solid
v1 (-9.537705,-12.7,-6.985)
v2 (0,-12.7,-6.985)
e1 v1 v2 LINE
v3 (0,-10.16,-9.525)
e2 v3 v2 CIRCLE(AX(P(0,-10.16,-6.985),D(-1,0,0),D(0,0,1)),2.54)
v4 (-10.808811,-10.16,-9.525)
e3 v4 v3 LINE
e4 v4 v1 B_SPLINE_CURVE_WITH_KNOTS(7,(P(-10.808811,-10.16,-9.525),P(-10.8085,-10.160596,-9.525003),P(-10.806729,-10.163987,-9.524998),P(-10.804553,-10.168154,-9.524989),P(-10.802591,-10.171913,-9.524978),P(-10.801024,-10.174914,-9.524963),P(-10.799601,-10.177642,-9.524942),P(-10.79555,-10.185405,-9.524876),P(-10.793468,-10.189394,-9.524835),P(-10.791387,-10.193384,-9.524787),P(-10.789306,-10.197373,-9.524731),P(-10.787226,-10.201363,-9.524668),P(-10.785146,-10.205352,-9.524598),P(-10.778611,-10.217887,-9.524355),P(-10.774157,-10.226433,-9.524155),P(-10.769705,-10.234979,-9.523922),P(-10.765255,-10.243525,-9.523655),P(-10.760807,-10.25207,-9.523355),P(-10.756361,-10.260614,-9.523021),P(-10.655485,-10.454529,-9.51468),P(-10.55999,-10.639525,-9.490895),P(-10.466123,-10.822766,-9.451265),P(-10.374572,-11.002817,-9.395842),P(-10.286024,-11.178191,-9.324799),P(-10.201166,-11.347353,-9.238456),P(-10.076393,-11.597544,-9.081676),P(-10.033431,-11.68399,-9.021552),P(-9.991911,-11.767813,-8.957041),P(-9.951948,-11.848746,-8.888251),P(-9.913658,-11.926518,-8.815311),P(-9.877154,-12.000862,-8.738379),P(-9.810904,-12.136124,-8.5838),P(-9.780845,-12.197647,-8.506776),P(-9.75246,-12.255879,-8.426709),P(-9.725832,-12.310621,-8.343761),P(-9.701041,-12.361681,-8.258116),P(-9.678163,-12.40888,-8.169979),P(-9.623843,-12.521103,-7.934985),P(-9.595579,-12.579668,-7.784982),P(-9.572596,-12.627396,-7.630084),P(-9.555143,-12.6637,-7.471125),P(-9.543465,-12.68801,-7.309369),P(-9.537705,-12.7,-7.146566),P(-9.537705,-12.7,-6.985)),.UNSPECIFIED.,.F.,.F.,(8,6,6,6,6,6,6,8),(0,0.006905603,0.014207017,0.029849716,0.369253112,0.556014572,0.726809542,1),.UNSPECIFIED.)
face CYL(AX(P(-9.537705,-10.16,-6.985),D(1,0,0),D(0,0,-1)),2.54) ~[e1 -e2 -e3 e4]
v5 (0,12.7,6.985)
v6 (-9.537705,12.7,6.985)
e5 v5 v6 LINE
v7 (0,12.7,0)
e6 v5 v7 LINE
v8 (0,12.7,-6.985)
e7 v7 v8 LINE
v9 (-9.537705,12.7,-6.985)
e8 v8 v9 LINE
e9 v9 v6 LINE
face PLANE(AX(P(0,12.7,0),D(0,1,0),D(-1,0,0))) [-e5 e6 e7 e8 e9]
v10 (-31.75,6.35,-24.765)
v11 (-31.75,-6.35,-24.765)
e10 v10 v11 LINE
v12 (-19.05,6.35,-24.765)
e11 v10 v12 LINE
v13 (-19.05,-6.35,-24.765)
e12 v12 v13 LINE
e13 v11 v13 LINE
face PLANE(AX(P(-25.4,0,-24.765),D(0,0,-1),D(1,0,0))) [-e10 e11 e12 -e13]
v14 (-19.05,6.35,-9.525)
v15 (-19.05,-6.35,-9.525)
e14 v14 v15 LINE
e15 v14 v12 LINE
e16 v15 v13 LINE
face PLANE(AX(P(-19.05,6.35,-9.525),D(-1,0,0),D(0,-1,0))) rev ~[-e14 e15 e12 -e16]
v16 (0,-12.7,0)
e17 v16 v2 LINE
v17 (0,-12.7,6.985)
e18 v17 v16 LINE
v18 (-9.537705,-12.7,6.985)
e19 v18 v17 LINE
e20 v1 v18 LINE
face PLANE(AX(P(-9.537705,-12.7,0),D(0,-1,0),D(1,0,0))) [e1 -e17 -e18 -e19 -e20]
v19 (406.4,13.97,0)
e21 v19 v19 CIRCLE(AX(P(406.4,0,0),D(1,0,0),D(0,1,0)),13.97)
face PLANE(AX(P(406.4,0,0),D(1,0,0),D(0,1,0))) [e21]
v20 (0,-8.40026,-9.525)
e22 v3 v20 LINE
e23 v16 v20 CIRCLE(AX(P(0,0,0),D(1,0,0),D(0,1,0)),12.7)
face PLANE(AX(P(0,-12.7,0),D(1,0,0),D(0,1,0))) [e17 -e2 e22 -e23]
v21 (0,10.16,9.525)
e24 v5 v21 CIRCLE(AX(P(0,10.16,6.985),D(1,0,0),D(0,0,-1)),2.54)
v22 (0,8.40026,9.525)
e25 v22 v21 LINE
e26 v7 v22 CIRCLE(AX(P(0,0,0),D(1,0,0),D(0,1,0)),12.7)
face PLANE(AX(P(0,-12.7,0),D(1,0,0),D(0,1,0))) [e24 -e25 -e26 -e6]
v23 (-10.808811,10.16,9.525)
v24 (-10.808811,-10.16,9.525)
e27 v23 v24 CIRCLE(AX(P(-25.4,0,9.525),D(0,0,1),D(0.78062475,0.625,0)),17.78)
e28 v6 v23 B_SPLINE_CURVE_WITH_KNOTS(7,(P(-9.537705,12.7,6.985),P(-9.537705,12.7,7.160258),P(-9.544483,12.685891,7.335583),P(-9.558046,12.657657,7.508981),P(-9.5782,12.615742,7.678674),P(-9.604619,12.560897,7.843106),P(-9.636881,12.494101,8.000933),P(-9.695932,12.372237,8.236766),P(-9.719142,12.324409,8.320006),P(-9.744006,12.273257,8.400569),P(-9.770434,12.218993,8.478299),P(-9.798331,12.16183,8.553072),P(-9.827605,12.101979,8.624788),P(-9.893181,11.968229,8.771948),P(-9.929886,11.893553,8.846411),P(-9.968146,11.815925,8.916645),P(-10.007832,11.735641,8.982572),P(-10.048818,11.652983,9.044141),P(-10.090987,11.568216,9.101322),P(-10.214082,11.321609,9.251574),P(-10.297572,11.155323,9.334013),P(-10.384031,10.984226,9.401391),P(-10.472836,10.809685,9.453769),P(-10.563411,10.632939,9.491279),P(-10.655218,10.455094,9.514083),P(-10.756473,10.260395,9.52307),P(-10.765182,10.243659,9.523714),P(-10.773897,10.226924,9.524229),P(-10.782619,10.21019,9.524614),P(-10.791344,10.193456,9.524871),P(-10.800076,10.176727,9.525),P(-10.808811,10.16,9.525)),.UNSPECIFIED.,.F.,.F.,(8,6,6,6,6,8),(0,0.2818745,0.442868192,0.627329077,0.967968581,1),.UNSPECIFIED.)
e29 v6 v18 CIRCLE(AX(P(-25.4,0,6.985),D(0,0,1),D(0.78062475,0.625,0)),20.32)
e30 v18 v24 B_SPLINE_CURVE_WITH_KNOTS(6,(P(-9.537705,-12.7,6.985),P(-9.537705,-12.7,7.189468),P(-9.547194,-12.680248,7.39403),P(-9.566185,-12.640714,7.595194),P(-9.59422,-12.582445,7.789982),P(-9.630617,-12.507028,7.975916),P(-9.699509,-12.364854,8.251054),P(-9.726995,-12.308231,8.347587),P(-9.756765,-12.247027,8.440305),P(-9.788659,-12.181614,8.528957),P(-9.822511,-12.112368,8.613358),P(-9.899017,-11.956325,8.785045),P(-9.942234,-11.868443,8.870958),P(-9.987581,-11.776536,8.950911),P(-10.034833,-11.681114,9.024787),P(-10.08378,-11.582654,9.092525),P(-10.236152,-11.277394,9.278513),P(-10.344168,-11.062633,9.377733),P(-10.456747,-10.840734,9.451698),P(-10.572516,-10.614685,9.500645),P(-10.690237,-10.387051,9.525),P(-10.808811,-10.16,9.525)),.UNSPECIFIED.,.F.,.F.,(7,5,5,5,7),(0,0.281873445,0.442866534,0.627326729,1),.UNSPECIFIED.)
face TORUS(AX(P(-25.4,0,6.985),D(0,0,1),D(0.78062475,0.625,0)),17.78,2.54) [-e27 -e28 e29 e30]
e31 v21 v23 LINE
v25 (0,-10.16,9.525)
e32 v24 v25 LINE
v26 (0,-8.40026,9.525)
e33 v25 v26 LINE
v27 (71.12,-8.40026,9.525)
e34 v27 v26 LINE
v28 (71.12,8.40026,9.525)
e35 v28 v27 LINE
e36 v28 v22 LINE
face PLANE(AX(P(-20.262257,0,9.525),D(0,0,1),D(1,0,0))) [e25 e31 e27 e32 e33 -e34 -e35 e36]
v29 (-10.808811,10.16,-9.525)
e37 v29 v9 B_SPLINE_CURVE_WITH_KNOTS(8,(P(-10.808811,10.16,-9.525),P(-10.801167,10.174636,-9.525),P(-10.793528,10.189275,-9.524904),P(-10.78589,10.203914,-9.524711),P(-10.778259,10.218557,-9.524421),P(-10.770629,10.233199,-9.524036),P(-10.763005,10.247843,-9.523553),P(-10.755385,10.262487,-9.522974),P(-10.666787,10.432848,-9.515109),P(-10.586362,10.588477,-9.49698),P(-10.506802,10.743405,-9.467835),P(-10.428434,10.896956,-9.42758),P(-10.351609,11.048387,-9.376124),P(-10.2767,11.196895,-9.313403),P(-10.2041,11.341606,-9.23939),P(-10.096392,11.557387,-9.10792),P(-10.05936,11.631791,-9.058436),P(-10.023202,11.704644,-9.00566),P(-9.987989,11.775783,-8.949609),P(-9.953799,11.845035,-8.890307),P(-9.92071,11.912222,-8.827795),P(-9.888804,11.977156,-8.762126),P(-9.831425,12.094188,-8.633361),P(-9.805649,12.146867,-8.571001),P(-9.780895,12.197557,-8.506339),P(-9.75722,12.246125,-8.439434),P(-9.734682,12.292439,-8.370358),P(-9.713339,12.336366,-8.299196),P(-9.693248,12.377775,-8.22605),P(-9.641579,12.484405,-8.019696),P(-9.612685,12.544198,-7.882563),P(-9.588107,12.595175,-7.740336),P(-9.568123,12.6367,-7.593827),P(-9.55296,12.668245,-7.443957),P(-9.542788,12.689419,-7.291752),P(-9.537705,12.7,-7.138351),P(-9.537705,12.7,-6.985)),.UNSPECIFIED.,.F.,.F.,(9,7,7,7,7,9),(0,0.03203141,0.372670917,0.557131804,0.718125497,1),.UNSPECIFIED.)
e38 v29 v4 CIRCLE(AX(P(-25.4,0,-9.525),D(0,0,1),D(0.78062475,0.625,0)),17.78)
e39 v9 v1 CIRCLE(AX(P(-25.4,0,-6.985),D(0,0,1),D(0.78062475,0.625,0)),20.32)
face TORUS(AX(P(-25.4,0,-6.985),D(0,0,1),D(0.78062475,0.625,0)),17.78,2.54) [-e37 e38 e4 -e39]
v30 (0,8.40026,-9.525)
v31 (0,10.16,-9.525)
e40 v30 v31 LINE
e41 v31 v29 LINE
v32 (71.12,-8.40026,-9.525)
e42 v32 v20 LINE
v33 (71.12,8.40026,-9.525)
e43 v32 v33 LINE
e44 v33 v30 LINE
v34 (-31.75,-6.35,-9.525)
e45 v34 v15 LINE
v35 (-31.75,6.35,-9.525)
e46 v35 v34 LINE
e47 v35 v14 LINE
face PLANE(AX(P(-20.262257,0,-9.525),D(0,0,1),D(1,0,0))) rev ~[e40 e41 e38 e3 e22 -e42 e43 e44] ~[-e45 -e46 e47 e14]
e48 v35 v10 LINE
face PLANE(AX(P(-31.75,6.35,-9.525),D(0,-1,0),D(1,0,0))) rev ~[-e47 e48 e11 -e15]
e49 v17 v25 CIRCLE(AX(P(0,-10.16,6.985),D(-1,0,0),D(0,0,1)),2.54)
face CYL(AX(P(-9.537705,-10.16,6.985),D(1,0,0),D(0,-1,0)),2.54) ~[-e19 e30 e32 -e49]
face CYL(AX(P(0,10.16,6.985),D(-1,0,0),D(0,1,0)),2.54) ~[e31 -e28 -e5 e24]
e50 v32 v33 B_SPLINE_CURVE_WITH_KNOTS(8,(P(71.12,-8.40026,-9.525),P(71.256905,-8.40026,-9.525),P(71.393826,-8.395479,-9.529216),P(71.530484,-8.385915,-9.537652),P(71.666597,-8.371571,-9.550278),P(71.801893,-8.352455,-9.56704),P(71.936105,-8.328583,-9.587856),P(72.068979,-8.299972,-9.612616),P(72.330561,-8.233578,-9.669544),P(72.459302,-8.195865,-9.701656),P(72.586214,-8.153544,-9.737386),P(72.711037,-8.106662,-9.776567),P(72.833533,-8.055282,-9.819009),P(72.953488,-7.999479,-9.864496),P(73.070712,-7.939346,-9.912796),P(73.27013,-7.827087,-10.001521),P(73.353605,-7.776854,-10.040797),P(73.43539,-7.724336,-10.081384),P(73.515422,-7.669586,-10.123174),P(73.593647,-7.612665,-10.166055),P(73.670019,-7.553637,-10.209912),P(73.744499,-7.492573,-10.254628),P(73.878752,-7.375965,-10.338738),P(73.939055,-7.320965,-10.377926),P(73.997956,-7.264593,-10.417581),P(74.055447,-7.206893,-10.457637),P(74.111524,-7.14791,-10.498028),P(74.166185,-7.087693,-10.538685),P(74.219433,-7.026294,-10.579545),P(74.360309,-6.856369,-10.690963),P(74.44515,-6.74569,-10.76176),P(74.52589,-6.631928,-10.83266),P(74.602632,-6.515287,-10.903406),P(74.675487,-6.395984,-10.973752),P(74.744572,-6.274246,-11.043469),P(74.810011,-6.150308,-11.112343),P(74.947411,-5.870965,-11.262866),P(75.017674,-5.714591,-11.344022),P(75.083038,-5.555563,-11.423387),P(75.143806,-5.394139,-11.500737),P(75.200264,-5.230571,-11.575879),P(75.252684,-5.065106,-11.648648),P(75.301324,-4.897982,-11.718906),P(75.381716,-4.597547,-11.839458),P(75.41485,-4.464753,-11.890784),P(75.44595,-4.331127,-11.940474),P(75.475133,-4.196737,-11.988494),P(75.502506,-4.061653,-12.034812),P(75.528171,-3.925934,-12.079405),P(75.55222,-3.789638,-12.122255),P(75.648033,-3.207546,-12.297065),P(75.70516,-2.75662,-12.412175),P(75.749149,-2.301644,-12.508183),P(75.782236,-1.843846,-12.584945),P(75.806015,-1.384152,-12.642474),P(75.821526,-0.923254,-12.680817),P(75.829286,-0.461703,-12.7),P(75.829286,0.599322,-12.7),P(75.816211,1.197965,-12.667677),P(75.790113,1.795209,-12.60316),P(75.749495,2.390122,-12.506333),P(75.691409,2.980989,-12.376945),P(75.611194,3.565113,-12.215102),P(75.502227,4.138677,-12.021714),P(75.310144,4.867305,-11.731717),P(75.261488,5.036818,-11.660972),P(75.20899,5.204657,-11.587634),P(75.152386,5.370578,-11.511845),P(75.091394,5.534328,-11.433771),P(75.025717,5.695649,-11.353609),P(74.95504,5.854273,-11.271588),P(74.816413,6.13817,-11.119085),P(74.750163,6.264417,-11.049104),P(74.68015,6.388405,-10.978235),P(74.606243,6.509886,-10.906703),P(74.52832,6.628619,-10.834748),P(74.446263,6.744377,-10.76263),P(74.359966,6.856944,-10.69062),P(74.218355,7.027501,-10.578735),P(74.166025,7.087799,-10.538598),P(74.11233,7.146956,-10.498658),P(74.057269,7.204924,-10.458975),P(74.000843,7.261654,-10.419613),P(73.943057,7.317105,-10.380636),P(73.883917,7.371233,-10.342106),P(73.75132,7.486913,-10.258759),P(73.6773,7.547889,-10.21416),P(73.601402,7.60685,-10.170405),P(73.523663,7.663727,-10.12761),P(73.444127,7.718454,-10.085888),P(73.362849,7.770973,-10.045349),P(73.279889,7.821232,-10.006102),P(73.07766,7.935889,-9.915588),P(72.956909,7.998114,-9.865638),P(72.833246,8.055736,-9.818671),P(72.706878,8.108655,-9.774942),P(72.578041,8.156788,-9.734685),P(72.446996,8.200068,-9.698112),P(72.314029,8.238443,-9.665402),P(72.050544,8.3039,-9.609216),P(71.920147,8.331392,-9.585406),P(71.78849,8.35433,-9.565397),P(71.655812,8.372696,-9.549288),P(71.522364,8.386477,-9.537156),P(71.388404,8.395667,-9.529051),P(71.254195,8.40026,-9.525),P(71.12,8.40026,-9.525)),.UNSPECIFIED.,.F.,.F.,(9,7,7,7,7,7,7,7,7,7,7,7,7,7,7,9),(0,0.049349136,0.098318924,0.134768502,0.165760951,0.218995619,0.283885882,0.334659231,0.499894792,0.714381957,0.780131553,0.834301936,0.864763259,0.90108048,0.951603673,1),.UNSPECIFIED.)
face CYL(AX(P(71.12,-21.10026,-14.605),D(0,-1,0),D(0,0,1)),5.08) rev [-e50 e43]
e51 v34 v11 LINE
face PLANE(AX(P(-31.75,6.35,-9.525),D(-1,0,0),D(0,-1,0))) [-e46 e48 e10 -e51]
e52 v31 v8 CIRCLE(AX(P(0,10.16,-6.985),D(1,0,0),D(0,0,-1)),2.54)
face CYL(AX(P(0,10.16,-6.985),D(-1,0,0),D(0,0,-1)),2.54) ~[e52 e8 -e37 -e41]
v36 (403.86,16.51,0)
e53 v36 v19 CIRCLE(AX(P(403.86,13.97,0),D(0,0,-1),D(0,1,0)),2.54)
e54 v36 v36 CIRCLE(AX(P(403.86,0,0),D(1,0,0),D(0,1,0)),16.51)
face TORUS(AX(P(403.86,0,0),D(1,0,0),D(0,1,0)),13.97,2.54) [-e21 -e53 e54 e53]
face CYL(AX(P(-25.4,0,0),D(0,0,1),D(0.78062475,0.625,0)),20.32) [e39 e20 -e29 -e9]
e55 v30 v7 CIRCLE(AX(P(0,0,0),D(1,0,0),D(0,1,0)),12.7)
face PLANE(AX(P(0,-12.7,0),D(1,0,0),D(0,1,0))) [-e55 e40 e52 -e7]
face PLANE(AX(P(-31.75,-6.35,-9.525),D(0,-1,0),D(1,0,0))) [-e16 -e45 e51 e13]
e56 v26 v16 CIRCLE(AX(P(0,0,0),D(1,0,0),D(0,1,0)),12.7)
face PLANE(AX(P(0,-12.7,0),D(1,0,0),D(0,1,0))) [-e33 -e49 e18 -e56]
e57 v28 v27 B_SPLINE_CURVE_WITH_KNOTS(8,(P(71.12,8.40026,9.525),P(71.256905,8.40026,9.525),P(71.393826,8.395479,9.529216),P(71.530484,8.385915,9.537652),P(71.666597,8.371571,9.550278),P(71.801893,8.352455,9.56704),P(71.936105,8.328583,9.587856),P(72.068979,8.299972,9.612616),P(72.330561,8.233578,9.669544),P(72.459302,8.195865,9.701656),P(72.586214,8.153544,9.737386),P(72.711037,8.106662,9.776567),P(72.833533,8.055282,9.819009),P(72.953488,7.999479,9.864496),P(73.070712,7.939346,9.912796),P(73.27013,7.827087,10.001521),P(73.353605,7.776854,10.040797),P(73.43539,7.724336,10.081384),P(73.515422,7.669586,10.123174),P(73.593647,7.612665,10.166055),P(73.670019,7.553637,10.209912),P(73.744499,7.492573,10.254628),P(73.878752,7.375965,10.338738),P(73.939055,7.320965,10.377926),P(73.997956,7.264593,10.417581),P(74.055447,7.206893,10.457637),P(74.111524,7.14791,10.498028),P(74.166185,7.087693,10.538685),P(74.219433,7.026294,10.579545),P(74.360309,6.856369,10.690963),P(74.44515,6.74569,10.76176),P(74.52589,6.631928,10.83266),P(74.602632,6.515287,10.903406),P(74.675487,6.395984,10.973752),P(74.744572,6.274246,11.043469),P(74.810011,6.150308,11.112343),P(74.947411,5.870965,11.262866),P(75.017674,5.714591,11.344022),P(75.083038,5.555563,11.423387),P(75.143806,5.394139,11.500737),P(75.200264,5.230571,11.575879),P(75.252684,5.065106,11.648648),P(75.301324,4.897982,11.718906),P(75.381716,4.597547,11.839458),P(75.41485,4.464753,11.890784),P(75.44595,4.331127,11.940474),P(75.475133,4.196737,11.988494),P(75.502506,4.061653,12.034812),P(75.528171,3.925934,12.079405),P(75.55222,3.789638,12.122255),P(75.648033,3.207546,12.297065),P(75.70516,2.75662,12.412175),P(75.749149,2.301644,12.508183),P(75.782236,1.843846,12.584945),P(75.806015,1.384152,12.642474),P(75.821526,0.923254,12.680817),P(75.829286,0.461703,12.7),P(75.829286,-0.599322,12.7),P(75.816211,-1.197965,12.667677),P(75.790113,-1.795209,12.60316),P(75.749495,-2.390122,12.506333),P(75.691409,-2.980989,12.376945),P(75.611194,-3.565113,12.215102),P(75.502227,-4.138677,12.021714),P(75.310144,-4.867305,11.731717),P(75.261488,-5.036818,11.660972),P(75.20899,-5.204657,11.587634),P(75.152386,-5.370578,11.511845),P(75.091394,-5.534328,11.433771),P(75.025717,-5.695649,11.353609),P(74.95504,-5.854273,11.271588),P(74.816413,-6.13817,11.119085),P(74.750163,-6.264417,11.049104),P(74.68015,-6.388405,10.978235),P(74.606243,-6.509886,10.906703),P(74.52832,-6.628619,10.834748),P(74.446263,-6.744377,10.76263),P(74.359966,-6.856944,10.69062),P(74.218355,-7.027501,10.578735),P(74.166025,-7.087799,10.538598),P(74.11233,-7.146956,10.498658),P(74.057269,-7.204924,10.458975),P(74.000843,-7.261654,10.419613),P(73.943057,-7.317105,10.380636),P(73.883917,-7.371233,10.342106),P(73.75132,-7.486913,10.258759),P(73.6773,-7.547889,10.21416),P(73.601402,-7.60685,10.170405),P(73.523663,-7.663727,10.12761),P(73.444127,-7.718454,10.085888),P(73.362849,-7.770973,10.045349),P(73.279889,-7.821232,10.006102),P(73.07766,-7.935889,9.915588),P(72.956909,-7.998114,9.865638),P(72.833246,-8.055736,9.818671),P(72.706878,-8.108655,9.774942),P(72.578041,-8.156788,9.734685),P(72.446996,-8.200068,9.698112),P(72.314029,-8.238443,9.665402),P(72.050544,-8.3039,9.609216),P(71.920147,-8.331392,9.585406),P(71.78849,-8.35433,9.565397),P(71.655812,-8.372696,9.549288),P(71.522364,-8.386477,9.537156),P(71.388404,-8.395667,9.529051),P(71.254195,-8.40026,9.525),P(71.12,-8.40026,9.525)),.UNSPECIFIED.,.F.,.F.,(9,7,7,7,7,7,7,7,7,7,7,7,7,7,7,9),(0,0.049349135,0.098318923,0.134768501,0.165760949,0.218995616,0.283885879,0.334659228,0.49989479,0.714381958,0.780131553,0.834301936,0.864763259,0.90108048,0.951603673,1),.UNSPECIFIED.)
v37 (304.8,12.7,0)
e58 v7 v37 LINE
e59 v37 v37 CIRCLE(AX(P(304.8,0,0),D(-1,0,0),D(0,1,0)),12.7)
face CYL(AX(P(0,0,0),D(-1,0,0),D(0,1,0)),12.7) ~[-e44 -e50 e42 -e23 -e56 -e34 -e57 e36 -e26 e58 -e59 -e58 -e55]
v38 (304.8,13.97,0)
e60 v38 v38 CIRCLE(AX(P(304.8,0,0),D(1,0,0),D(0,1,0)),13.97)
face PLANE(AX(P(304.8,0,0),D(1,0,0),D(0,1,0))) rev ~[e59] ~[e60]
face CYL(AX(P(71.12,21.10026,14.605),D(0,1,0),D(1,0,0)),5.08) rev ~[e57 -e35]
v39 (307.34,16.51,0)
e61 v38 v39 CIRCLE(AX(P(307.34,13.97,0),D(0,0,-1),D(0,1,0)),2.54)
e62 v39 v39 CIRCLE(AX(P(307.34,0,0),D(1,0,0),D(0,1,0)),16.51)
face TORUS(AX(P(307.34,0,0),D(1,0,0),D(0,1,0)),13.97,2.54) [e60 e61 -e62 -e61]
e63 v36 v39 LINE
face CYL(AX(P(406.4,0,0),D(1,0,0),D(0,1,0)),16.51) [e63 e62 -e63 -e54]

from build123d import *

# Parameters (mm, degrees)
F0_R        = 12.7
F1_DEPTH    = 406.4
F2_R        = 16.51
F3_DEPTH    = 101.6
F5_DEPTH    = 9.525
F6_W        = 76.2
F6_H        = 3.175
F7_DEPTH    = 12.7
F8_T4_DEPTH = 42.2005208253
F8_S5_R     = 12.7
F8_T6_DEPTH = 23
F9_T4_DEPTH = 42.2005208253
F9_S5_R     = 12.7
F9_T6_DEPTH = 23
F10_R       = 2.54
F11_W       = 12.7
F11_H       = 12.7
F12_DEPTH   = 15.24


# Not quite as in the source:
# - a fillet or chamfer that OpenCascade refuses, or shapes differently, is made with other operations: its cross-section is extruded or revolved along the edge and cut away or added


with BuildPart() as f1:
    # F0 (on Right) → F1 (new body)
    with BuildSketch(Plane.YZ):
        Circle(F0_R)
    extrude(amount=F1_DEPTH)

    # F2 (on face) → F3 (join)
    with BuildSketch(Plane.YZ.offset(406.4)):
        Circle(F2_R)
    extrude(amount=-F3_DEPTH)

    # F4 (on Top) → F5 (join, symmetric)
    with BuildSketch(Plane.XY):
        with BuildLine():
            Line((0, 12.7), (-9.5377050841, 12.7))
            ThreePointArc((-9.5377050841, 12.7), (-45.72, 0), (-9.5377050841, -12.7))
            Line((-9.5377050841, -12.7), (0, -12.7))
            Line((0, -12.7), (0, 12.7))
        make_face()
    extrude(amount=F5_DEPTH, both=True)

    # F6 (on Front) → F7 (cut, symmetric)
    with BuildSketch(Plane.XZ):
        with Locations((38.1, 11.1125)):
            Rectangle(F6_W, F6_H)
        with Locations((38.1, -11.1125)):
            Rectangle(F6_W, F6_H)
    extrude(amount=F7_DEPTH, both=True, mode=Mode.SUBTRACT)

    # F8: fillet of radius 5.08 on 1 edges, made by hand


with BuildPart() as f8_tool2:
    # F8_s3 → F8_t4 (new body)
    with BuildSketch(Plane.XZ.offset(-21.1002604126)):
        with BuildLine():
            ThreePointArc((76.2, 14.605), (74.7121024484, 11.0128975516), (71.12, 9.525))
            Line((71.12, 9.525), (76.2, 9.525))
            Line((76.2, 9.525), (76.2, 14.605))
        make_face()
    extrude(amount=F8_T4_DEPTH)

    # F8_s5 → F8_t6 (intersect, symmetric)
    with BuildSketch(Plane.YZ.offset(73.7)):
        Circle(F8_S5_R)
    extrude(amount=F8_T6_DEPTH, both=True, mode=Mode.INTERSECT)


with BuildPart() as f1_1:
    add(f1.part)

    # F8_t1: union F8_tool2
    add(f8_tool2.part)

    # F9: fillet of radius 5.08 on 1 edges, made by hand


with BuildPart() as f9_tool2:
    # F9_s3 → F9_t4 (new body)
    with BuildSketch(Plane.XZ.offset(21.1002604126)):
        with BuildLine():
            ThreePointArc((71.12, -9.525), (74.7121024484, -11.0128975516), (76.2, -14.605))
            Line((76.2, -14.605), (76.2, -9.525))
            Line((76.2, -9.525), (71.12, -9.525))
        make_face()
    extrude(amount=-F9_T4_DEPTH)

    # F9_s5 → F9_t6 (intersect, symmetric)
    with BuildSketch(Plane.YZ.offset(73.7)):
        Circle(F9_S5_R)
    extrude(amount=F9_T6_DEPTH, both=True, mode=Mode.INTERSECT)


with BuildPart() as f1_2:
    add(f1_1.part)

    # F9_t1: union F9_tool2
    add(f9_tool2.part)

    # F10
    f10_edges = [f1_2.edges().sort_by_distance(p)[0] for p in [
        (-45.72, 0, -9.525),
        (-45.72, 0, 9.525),
        (-4.768853, -12.7, -9.525),
        (-4.768853, -12.7, 9.525),
        (-4.768853, 12.7, -9.525),
        (-4.768853, 12.7, 9.525),
        (406.4, -16.51, 0),
        (304.8, -16.51, 0),
    ]]
    fillet(f10_edges, radius=F10_R)

    # F11 (on face) → F12 (join)
    with BuildSketch(Plane(origin=(0, 0, -9.525), x_dir=(1, 0, 0), z_dir=(0, 0, -1))):
        with Locations((-25.4, 0)):
            Rectangle(F11_W, F11_H)
    extrude(amount=F12_DEPTH)


solid = f1_2.part
